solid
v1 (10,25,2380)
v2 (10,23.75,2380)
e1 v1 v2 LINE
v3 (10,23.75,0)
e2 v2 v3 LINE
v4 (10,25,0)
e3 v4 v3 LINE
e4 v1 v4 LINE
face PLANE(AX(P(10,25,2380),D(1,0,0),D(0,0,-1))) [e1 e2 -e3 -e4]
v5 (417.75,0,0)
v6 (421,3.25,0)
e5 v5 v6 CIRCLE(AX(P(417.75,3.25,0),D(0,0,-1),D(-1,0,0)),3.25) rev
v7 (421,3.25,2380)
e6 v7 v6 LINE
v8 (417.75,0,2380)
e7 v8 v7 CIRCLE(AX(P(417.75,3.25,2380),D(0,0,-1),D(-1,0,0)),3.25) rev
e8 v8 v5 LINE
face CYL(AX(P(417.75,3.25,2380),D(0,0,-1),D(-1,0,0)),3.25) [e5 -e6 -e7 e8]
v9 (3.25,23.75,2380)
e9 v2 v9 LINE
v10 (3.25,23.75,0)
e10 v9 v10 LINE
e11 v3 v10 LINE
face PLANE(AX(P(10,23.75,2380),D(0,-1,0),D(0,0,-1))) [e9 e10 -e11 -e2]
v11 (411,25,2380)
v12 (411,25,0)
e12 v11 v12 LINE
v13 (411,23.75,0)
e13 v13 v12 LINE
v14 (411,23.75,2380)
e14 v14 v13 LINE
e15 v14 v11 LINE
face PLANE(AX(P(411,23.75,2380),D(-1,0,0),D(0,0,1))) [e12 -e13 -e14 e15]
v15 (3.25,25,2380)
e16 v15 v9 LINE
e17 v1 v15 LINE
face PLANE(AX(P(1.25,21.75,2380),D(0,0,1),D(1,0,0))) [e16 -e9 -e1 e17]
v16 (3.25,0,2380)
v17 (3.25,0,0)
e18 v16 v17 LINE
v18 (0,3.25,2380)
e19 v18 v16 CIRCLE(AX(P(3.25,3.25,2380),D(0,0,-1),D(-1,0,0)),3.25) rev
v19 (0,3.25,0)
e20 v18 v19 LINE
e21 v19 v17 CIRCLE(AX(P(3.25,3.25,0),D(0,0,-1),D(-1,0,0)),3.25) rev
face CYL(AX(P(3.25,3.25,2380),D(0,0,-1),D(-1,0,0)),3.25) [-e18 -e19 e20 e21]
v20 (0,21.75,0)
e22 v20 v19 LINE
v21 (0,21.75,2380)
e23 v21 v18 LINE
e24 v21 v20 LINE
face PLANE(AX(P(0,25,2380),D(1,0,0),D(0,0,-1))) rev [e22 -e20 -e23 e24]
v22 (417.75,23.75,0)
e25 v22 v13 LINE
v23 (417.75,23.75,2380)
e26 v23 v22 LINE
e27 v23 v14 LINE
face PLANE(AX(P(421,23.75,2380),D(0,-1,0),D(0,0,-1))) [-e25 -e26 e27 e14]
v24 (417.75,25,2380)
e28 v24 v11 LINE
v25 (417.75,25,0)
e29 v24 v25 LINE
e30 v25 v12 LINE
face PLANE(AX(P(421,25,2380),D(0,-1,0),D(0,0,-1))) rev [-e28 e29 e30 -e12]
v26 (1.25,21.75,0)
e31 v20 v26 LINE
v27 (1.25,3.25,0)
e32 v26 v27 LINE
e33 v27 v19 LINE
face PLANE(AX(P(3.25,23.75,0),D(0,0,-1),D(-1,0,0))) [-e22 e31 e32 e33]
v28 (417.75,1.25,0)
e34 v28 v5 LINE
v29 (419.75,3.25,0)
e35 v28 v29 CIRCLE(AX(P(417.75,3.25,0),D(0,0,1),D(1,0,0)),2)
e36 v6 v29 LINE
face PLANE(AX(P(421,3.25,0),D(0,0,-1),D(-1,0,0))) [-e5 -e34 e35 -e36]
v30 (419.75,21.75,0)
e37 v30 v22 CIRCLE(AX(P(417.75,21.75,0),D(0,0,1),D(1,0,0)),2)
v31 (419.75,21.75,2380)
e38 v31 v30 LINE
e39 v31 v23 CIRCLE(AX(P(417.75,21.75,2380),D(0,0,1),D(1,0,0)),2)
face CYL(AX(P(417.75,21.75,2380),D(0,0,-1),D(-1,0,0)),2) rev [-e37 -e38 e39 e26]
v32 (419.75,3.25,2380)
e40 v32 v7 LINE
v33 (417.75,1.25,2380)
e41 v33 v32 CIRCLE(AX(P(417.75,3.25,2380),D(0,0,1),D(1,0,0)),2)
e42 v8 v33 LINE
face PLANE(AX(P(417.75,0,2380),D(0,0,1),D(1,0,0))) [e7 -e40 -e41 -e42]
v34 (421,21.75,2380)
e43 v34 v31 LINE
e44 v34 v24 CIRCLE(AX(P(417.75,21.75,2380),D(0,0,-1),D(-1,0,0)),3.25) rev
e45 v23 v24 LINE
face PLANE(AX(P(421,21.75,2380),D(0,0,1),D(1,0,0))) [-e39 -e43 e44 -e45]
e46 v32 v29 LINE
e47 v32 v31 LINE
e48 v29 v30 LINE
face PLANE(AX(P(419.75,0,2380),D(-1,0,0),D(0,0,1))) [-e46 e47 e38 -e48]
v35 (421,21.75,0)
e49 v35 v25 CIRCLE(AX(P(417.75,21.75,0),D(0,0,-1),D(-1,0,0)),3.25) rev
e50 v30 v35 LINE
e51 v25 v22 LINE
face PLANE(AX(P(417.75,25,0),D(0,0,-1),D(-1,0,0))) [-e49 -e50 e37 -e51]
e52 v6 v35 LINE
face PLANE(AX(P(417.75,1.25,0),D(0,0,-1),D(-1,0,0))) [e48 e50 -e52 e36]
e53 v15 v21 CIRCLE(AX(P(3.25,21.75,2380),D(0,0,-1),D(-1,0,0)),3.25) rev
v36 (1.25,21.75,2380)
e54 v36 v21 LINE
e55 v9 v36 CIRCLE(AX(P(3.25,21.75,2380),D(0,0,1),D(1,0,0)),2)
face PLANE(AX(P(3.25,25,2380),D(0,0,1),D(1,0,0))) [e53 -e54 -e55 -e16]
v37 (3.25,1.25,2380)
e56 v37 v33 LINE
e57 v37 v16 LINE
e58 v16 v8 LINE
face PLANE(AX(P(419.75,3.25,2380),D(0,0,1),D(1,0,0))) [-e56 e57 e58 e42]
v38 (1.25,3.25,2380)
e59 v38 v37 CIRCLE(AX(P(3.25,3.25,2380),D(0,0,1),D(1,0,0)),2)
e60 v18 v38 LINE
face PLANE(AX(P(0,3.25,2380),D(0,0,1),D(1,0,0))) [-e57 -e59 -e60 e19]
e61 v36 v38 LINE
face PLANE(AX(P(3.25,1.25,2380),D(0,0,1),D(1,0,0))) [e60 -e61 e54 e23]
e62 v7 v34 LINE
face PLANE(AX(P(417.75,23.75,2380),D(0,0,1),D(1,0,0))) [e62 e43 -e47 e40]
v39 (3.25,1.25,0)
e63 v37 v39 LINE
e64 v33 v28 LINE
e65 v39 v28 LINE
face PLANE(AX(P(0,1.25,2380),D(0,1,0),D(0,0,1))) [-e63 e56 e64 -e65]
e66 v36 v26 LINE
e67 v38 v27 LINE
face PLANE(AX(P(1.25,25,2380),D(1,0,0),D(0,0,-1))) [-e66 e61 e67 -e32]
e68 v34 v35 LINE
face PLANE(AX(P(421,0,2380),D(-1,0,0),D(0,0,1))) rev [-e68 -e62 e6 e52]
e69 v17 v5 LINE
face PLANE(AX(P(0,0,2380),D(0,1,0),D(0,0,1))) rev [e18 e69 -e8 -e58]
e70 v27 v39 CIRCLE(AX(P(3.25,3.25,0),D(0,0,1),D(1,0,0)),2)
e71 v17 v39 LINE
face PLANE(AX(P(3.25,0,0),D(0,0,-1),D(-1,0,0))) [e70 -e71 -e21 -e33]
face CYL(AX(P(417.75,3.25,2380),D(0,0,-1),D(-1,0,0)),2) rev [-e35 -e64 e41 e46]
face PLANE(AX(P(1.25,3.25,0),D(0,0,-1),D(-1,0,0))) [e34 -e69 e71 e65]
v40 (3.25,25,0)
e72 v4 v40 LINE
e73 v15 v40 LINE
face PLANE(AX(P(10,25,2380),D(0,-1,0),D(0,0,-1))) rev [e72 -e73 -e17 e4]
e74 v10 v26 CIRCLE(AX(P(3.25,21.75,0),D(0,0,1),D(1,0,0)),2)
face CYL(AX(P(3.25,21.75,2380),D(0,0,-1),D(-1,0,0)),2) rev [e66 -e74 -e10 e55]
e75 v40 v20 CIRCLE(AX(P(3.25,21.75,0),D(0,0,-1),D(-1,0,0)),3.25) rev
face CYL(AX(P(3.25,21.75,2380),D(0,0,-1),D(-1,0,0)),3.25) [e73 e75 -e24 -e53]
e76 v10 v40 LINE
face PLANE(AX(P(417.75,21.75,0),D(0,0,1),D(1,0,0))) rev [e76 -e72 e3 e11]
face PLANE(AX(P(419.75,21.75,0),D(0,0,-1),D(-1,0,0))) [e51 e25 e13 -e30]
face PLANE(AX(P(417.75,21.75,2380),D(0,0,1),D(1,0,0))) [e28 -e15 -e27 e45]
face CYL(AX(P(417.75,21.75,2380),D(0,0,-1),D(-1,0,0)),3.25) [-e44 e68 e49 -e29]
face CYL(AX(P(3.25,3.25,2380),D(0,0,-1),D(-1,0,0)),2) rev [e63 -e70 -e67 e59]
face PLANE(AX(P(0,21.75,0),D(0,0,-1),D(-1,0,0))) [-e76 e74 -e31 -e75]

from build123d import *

# Parameters (mm, degrees)
BASE_FLANGE1_DEPTH = 2380


# Sheet-metal steps are written as plain solids
with BuildPart() as part:
    # Sketch1 → Base-Flange1 (new body)
    with BuildSketch(Plane.XY):
        with BuildLine():
            Line((10, 25), (3.25, 25))
            ThreePointArc((3.25, 25), (0.951902961, 24.048097039), (0, 21.75))
            Line((0, 21.75), (0, 3.25))
            ThreePointArc((0, 3.25), (0.951902961, 0.951902961), (3.25, 0))
            Line((3.25, 0), (417.75, 0))
            ThreePointArc((417.75, 0), (420.048097039, 0.951902961), (421, 3.25))
            Line((421, 3.25), (421, 21.75))
            ThreePointArc((421, 21.75), (420.048097039, 24.048097039), (417.75, 25))
            Line((417.75, 25), (411, 25))
            Line((411, 25), (411, 23.75))
            Line((411, 23.75), (417.75, 23.75))
            ThreePointArc((417.75, 23.75), (419.164213562, 23.164213562), (419.75, 21.75))
            Line((419.75, 21.75), (419.75, 3.25))
            ThreePointArc((419.75, 3.25), (419.164213562, 1.835786438), (417.75, 1.25))
            Line((417.75, 1.25), (3.25, 1.25))
            ThreePointArc((3.25, 1.25), (1.835786438, 1.835786438), (1.25, 3.25))
            Line((1.25, 3.25), (1.25, 21.75))
            ThreePointArc((1.25, 21.75), (1.835786438, 23.164213562), (3.25, 23.75))
            Line((3.25, 23.75), (10, 23.75))
            Line((10, 23.75), (10, 25))
        make_face()
    extrude(amount=BASE_FLANGE1_DEPTH)


solid = part.part
